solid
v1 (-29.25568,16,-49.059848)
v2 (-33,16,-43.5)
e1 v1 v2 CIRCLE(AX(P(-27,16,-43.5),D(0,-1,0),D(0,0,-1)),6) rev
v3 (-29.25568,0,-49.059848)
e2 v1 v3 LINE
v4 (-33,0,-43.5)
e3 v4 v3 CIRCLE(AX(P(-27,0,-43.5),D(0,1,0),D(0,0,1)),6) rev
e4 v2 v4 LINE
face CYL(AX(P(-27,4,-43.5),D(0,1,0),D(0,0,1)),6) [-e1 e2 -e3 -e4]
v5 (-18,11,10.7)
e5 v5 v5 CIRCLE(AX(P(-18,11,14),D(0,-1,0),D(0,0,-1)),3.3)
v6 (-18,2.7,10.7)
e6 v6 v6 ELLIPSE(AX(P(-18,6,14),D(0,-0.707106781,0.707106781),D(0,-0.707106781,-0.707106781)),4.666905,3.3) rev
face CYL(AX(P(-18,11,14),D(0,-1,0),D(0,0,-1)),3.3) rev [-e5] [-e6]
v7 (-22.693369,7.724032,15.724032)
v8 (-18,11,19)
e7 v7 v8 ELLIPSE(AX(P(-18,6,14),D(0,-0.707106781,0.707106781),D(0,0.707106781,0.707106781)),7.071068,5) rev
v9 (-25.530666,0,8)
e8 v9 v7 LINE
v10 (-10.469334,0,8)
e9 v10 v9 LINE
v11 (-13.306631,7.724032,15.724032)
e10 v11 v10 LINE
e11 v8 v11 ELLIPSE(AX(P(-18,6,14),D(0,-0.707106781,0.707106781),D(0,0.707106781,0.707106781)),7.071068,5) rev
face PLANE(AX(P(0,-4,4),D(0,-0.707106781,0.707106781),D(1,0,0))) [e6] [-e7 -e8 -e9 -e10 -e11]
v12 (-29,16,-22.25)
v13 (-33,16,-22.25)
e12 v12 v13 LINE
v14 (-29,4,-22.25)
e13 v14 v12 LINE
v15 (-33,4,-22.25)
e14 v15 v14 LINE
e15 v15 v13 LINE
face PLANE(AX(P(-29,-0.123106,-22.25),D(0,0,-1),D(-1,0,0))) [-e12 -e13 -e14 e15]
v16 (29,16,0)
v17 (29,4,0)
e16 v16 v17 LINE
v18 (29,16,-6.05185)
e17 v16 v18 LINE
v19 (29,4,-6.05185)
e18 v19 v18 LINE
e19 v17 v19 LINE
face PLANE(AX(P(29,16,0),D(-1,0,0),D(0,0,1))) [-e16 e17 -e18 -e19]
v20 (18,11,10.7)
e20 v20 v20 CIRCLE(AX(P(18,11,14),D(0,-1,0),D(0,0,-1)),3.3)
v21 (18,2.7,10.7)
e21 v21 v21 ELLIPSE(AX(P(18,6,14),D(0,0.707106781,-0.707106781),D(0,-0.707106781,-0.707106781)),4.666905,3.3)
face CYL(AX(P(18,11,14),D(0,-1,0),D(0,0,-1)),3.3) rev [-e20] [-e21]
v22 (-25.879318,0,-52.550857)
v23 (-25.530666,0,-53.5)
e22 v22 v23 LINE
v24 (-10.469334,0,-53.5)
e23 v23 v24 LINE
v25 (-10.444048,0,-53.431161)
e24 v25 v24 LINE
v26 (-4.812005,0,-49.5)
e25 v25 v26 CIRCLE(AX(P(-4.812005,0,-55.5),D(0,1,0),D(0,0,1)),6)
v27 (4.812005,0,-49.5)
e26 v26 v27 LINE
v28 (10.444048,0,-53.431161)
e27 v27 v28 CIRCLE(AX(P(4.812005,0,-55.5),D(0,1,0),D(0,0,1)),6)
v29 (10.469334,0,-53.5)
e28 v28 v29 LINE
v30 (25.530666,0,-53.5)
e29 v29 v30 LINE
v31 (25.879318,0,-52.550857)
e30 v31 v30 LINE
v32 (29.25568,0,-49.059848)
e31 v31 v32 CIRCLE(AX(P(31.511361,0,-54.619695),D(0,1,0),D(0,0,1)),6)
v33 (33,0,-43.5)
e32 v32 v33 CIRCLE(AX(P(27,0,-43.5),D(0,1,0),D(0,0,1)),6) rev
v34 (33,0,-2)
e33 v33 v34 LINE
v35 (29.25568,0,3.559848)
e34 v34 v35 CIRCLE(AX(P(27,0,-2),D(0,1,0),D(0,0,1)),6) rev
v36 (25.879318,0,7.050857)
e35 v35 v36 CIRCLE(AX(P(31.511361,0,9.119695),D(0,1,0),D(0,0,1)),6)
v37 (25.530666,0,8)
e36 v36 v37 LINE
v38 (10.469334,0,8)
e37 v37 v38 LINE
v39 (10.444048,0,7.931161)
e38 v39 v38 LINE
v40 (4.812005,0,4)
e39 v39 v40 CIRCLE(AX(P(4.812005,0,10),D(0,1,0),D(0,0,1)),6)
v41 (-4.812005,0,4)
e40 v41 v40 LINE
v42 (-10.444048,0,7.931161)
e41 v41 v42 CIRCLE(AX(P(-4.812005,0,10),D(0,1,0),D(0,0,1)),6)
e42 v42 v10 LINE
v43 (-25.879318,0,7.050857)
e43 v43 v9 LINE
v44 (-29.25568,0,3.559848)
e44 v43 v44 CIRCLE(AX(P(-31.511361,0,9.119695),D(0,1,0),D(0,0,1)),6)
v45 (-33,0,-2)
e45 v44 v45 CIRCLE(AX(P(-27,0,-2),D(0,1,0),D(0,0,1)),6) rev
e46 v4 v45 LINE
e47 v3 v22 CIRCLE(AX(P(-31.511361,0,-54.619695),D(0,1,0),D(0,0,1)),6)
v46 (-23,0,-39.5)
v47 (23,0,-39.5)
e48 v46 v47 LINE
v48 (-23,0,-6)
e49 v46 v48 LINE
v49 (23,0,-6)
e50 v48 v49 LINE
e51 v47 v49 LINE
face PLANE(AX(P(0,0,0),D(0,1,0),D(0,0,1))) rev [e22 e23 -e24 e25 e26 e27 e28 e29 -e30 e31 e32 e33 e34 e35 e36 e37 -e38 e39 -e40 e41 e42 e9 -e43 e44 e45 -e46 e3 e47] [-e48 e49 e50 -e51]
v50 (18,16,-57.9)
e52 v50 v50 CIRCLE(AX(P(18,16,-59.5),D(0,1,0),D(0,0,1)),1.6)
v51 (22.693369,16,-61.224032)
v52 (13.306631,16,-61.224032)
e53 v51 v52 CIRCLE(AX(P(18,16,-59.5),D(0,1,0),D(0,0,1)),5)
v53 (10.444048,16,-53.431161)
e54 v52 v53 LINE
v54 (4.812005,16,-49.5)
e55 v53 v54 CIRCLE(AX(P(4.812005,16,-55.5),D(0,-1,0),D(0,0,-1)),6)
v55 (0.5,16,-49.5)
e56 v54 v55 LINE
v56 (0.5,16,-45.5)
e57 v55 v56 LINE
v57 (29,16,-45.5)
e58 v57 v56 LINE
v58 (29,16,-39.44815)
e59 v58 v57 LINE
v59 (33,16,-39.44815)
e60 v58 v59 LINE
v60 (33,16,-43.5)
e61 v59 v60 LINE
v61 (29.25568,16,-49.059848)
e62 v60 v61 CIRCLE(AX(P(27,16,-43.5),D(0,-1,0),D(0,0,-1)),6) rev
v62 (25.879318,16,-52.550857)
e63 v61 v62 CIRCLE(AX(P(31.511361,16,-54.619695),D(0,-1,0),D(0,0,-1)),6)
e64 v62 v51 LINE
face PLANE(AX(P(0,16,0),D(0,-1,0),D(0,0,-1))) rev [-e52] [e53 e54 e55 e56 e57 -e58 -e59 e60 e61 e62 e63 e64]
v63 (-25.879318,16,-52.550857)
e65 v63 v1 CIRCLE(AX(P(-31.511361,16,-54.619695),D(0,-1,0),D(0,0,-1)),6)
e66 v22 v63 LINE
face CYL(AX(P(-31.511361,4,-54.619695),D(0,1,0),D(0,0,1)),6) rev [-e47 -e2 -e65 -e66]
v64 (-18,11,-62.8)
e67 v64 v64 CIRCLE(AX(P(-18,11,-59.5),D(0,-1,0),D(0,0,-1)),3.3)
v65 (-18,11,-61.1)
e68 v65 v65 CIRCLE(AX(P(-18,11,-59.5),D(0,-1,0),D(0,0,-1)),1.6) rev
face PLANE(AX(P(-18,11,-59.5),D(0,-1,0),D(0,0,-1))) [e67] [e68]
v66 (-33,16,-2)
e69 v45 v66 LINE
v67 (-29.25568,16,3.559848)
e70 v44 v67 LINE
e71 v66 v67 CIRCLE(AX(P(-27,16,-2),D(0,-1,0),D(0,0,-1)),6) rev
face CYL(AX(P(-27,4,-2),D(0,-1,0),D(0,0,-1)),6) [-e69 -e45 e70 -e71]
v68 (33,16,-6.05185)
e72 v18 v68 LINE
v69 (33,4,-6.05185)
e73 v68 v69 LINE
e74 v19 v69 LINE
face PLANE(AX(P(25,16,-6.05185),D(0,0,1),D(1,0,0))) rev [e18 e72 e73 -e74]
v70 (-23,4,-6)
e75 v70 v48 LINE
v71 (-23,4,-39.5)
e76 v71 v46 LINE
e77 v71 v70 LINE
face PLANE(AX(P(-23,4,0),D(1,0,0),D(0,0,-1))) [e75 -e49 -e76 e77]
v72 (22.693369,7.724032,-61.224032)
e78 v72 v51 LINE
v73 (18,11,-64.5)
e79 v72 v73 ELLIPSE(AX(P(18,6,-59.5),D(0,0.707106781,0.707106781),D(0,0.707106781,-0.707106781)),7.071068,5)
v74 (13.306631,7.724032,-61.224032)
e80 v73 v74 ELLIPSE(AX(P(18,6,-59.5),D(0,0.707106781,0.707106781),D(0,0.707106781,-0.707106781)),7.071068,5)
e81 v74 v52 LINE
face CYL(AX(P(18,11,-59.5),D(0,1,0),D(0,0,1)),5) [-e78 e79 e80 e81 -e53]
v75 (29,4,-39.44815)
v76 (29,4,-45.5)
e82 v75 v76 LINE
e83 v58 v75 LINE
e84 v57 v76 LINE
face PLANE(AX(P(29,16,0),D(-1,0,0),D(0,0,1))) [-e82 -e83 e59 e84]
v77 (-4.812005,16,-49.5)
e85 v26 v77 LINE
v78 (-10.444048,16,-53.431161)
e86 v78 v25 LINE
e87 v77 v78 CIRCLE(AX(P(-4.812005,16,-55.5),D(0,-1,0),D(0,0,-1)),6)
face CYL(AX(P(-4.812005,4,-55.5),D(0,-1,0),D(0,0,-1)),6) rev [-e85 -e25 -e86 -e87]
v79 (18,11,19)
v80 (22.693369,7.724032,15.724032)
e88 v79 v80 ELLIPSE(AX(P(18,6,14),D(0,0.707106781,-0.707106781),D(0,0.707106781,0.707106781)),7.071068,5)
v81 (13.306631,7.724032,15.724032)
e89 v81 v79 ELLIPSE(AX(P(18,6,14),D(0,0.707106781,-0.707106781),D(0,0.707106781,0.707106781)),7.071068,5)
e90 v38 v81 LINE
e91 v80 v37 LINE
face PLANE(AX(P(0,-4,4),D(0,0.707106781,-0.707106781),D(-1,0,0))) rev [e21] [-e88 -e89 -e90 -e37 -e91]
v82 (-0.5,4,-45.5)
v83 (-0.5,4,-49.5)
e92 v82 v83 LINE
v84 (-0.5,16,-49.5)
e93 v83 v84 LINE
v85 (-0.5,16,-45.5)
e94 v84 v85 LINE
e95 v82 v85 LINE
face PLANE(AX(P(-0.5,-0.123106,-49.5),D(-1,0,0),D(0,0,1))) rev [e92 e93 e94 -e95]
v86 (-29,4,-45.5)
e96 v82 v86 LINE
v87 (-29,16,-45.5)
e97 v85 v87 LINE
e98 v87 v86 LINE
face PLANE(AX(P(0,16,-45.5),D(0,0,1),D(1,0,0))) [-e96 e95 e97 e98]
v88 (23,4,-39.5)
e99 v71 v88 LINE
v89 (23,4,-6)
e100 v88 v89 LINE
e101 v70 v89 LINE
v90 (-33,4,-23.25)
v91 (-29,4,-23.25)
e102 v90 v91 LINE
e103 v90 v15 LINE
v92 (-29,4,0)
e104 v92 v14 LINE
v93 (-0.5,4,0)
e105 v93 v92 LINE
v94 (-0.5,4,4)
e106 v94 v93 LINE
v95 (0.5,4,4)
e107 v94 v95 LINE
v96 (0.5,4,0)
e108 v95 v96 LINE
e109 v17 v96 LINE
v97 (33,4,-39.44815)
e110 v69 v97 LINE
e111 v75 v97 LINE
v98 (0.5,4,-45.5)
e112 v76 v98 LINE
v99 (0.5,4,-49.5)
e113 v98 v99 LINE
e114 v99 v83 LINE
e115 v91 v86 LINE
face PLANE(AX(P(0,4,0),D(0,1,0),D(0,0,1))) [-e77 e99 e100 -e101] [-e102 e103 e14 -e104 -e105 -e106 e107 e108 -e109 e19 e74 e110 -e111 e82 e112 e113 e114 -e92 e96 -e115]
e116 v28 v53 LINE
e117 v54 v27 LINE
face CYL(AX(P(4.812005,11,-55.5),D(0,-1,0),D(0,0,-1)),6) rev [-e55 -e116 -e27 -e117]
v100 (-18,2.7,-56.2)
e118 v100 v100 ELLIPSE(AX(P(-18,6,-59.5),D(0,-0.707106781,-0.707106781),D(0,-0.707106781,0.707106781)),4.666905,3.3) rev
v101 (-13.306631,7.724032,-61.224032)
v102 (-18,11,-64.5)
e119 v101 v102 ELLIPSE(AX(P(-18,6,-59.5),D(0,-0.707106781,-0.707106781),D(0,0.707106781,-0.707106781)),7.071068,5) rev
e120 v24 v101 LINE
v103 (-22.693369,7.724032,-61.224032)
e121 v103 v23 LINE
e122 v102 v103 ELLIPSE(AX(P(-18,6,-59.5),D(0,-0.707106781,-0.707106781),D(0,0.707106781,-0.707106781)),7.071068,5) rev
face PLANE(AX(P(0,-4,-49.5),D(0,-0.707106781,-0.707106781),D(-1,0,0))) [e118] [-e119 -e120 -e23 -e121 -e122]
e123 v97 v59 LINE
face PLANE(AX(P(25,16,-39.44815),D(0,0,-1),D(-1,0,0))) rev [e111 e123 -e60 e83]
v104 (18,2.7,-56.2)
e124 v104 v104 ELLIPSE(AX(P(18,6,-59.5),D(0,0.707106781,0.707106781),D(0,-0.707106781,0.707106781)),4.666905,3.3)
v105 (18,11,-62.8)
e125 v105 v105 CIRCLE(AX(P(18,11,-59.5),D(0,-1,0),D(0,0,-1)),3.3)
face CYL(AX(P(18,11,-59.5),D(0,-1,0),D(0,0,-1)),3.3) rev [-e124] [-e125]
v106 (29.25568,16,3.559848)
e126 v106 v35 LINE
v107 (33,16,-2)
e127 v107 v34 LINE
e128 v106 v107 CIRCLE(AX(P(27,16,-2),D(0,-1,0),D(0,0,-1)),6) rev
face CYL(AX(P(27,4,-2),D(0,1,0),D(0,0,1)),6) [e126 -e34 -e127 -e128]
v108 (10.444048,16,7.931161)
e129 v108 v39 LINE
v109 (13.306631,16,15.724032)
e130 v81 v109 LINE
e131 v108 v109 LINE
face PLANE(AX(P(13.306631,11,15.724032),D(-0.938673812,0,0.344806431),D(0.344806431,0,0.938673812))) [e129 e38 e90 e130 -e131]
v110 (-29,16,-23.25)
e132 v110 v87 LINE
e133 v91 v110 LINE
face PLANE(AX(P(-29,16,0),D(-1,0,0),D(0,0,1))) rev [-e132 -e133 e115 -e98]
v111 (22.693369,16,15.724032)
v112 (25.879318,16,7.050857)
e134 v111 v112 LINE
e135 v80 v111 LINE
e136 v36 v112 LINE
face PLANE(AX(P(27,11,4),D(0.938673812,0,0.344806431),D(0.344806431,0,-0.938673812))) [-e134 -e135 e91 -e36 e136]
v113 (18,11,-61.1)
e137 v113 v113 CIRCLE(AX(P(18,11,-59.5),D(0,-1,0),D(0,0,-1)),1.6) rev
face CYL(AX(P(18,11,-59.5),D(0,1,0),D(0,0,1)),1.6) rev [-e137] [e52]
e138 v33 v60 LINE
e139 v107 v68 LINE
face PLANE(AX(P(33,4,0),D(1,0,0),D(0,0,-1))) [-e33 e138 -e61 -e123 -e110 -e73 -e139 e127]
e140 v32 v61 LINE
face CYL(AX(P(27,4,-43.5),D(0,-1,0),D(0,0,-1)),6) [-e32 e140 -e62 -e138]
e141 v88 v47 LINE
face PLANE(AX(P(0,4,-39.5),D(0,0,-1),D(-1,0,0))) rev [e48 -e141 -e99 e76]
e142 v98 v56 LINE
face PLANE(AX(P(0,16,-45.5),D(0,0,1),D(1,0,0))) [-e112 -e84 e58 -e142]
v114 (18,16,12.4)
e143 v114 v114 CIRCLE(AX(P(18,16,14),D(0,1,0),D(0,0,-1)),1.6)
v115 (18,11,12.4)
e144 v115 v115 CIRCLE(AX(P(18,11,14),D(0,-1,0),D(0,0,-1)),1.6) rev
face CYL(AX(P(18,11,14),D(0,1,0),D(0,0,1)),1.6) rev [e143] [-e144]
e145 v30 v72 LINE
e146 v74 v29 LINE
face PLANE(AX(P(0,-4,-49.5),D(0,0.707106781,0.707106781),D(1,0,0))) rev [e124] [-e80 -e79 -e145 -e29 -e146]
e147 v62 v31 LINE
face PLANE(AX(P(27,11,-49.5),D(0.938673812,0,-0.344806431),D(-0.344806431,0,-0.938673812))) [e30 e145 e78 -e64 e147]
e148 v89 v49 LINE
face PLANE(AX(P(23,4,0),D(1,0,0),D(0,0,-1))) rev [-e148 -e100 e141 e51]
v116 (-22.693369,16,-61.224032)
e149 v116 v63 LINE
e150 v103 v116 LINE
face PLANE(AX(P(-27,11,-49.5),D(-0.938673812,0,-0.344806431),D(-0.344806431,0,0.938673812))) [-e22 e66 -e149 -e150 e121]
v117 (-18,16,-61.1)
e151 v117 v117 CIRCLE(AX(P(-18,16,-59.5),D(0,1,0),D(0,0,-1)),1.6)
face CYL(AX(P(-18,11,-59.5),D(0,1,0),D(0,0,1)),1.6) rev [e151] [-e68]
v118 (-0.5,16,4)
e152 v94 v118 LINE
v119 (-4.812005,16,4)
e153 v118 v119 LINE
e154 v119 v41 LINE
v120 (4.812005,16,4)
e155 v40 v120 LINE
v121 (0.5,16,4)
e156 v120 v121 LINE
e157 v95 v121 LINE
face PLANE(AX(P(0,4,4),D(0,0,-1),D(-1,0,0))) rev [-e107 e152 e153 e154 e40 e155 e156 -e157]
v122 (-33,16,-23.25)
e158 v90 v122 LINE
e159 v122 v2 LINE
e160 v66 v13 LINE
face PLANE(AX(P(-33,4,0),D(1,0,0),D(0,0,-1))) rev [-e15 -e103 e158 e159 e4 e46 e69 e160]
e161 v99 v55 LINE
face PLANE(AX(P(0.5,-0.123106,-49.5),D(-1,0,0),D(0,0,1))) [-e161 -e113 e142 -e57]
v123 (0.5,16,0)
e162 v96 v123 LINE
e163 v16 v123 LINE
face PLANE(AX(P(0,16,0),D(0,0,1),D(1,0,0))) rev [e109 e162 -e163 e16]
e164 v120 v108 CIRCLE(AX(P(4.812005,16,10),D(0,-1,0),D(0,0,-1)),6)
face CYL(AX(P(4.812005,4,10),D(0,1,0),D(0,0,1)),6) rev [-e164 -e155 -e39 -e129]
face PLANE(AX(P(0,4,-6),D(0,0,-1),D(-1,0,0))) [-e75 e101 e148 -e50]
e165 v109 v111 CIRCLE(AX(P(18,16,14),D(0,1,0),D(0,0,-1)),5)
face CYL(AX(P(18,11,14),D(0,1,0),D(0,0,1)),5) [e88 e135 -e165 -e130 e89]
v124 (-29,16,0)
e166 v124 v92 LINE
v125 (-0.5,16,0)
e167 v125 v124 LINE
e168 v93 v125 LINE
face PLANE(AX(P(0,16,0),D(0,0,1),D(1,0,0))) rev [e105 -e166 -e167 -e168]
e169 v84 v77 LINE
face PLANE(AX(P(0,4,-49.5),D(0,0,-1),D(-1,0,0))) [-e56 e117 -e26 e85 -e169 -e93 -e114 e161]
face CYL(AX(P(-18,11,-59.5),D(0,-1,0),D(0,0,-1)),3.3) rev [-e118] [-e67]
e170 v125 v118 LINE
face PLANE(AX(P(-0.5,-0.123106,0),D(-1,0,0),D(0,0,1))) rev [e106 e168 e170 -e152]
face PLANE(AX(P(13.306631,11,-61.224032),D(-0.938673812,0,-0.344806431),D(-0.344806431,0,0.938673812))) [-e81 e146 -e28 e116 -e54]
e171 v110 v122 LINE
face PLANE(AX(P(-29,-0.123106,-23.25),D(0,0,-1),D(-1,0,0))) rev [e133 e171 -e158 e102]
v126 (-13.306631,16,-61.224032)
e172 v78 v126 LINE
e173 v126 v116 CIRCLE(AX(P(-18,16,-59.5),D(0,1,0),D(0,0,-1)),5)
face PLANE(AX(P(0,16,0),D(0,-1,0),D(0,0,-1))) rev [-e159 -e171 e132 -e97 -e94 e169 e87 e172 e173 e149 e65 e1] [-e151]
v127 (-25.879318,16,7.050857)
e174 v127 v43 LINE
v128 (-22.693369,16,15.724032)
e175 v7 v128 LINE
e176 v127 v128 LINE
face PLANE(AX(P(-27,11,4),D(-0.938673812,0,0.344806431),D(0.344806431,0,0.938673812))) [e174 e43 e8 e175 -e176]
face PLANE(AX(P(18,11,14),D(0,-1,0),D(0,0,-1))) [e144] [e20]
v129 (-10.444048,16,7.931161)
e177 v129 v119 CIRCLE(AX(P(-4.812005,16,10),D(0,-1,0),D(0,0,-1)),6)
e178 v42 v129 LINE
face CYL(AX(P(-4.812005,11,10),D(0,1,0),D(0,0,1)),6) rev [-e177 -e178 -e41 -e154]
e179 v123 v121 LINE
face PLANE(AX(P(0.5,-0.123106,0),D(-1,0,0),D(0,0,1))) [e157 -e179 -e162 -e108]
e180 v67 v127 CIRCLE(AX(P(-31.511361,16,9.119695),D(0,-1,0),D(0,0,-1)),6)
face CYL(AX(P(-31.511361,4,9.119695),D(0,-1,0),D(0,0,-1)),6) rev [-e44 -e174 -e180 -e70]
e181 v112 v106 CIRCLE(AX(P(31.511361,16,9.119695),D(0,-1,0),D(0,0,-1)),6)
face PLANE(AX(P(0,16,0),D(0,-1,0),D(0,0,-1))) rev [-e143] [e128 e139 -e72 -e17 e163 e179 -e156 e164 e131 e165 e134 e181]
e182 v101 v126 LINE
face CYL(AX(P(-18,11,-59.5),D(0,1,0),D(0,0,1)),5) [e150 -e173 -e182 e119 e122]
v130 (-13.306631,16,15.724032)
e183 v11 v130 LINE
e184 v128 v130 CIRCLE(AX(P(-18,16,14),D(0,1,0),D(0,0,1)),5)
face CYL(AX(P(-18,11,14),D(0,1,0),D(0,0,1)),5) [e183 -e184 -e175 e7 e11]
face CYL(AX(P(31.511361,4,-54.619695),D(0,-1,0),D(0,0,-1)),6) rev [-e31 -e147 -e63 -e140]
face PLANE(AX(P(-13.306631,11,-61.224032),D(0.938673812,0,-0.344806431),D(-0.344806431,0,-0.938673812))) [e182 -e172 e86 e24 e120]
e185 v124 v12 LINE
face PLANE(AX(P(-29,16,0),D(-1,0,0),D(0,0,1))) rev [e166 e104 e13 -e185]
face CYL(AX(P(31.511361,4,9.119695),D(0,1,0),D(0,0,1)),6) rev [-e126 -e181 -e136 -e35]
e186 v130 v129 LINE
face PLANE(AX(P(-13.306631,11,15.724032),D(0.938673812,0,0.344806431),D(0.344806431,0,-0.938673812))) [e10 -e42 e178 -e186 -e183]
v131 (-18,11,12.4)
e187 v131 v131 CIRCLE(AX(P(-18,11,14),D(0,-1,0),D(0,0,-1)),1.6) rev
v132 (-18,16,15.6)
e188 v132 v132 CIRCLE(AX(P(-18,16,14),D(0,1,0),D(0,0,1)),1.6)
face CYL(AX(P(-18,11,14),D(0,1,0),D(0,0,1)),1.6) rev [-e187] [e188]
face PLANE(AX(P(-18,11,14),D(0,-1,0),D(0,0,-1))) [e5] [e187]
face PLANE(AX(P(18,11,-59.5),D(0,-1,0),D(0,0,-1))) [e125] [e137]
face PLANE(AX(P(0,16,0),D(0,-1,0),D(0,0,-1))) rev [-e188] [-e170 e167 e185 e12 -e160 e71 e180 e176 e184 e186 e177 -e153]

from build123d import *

# Parameters (mm, degrees)
SKETCH_1_W            = 66
SKETCH_1_H            = 53.5
SKETCH_1_W_2          = 58
SKETCH_1_H_2          = 45.5
SKETCH_1_W_3          = 46
SKETCH_1_H_3          = 33.5
EXTRUDE_1_DEPTH       = 4
EXTRUDE_START         = 4
SKETCH_1_4_W          = 66
SKETCH_1_4_H          = 53.5
SKETCH_1_4_W_2        = 58
SKETCH_1_4_H_2        = 45.5
EXTRUDE_2_DEPTH       = 12
SKETCH_2_R            = 1.6
EXTRUDE_3_DEPTH       = 5
CHAMFER_1_OUTLINE_R   = 1.6
CHAMFER_1_DEPTH       = 11
CHAMFER_START         = -14
CHAMFER_1_2_OUTLINE_W = 54
CHAMFER_1_2_OUTLINE_H = 60.830212793
CHAMFER_1_2_DEPTH     = 8.343145751
CHAMFER_START_2       = 35.001785669
CHAMFER_1_3_OUTLINE_W = 54
CHAMFER_1_3_OUTLINE_H = 8.169787207
CHAMFER_1_3_DEPTH     = 18.384776311
SKETCH_4_R            = 3.3
CUT_EXTRUDE_1_DEPTH   = 11
SKETCH_5_W            = 1
SKETCH_5_H            = 4
SKETCH_5_W_2          = 4
SKETCH_5_H_2          = 1
CUT_EXTRUDE_1_2_DEPTH = 12
FILLET_1_R            = 6
FILLET_2_R            = 6
SKETCH_6_W            = 33.396299262
SKETCH_6_H            = 12
CUT_EXTRUDE_2_DEPTH   = 8


with BuildPart() as part:
    # 草图1 → 凸台-拉伸1 (new body)
    # profile 1 of 2: a face of its own
    with BuildSketch(Plane(origin=(0, 0, 0), x_dir=(1, 0, 0), z_dir=(0, 1, 0))):
        with Locations((0, 22.75)):
            Rectangle(SKETCH_1_W, SKETCH_1_H)
        with Locations((0, 22.75)):
            Rectangle(SKETCH_1_W_2, SKETCH_1_H_2, mode=Mode.SUBTRACT)
    # profile 2 of 2: a face of its own
    with BuildSketch(Plane(origin=(0, 0, 0), x_dir=(1, 0, 0), z_dir=(0, 1, 0))):
        with Locations((0, 22.75)):
            Rectangle(SKETCH_1_W_2, SKETCH_1_H_2)
        with Locations((0, 22.75)):
            Rectangle(SKETCH_1_W_3, SKETCH_1_H_3, mode=Mode.SUBTRACT)
    extrude(amount=EXTRUDE_1_DEPTH)

    # 草图1<4> → 凸台-拉伸2 (add)
    with BuildSketch(Plane(origin=(0, 0, 0), x_dir=(1, 0, 0), z_dir=(0, 1, 0)).offset(EXTRUDE_START)):
        with Locations((0, 22.75)):
            Rectangle(SKETCH_1_4_W, SKETCH_1_4_H)
        with Locations((0, 22.75)):
            Rectangle(SKETCH_1_4_W_2, SKETCH_1_4_H_2, mode=Mode.SUBTRACT)
    extrude(amount=EXTRUDE_2_DEPTH)

    # 草图2 → 凸台-拉伸3 (add)
    # profile 1 of 4: a face of its own
    with BuildSketch(Plane(origin=(0, 16, 0), x_dir=(1, 0, 0), z_dir=(0, 1, 0))):
        with BuildLine():
            Line((13.30663094, 61.224032154), (9, 49.5))
            Line((9, 49.5), (27, 49.5))
            Line((27, 49.5), (22.69336906, 61.224032154))
            ThreePointArc((22.69336906, 61.224032154), (18, 64.5), (13.30663094, 61.224032154))
        make_face()
        with Locations(Location((18, 59.5, 0), (0, 0, 270))):
            Circle(SKETCH_2_R, mode=Mode.SUBTRACT)
    # profile 2 of 4: a face of its own
    with BuildSketch(Plane(origin=(0, 16, 0), x_dir=(1, 0, 0), z_dir=(0, 1, 0))):
        with BuildLine():
            Line((-27, 49.5), (-22.69336906, 61.224032154))
            ThreePointArc((-22.69336906, 61.224032154), (-18, 64.5), (-13.30663094, 61.224032154))
            Line((-13.30663094, 61.224032154), (-9, 49.5))
            Line((-9, 49.5), (-27, 49.5))
        make_face()
        with Locations(Location((-18, 59.5, 0), (0, 0, 90))):
            Circle(SKETCH_2_R, mode=Mode.SUBTRACT)
    # profile 3 of 4: a face of its own
    with BuildSketch(Plane(origin=(0, 16, 0), x_dir=(1, 0, 0), z_dir=(0, 1, 0))):
        with BuildLine():
            Line((-13.30663094, -15.724032154), (-9, -4))
            Line((-9, -4), (-27, -4))
            Line((-27, -4), (-22.69336906, -15.724032154))
            ThreePointArc((-22.69336906, -15.724032154), (-18, -19), (-13.30663094, -15.724032154))
        make_face()
        with Locations(Location((-18, -14, 0), (0, 0, 270))):
            Circle(SKETCH_2_R, mode=Mode.SUBTRACT)
    # profile 4 of 4: a face of its own
    with BuildSketch(Plane(origin=(0, 16, 0), x_dir=(1, 0, 0), z_dir=(0, 1, 0))):
        with BuildLine():
            Line((27, -4), (22.69336906, -15.724032154))
            ThreePointArc((22.69336906, -15.724032154), (18, -19), (13.30663094, -15.724032154))
            Line((13.30663094, -15.724032154), (9, -4))
            Line((9, -4), (27, -4))
        make_face()
        with Locations(Location((18, -14, 0), (0, 0, 90))):
            Circle(SKETCH_2_R, mode=Mode.SUBTRACT)
    extrude(amount=-EXTRUDE_3_DEPTH)

    # 倒角1: read off the stored shape, not the designer's step
    # 倒角1 outline → 倒角1 (add)
    # profile 1 of 4: a face of its own
    with BuildSketch(Plane(origin=(0, 0, 0), x_dir=(1, 0, 0), z_dir=(0, 1, 0))):
        with BuildLine():
            Line((9, 49.5), (27, 49.5))
            Line((27, 49.5), (22.69336906, 61.224032154))
            ThreePointArc((22.69336906, 61.224032154), (18, 64.5), (13.30663094, 61.224032154))
            Line((13.30663094, 61.224032154), (9, 49.5))
        make_face()
        with Locations((18, 59.5)):
            Circle(CHAMFER_1_OUTLINE_R, mode=Mode.SUBTRACT)
    # profile 2 of 4: a face of its own
    with BuildSketch(Plane(origin=(0, 0, 0), x_dir=(1, 0, 0), z_dir=(0, 1, 0))):
        with BuildLine():
            Line((-27, 49.5), (-9, 49.5))
            Line((-9, 49.5), (-13.30663094, 61.224032154))
            ThreePointArc((-13.30663094, 61.224032154), (-18, 64.5), (-22.69336906, 61.224032154))
            Line((-22.69336906, 61.224032154), (-27, 49.5))
        make_face()
        with Locations((-18, 59.5)):
            Circle(CHAMFER_1_OUTLINE_R, mode=Mode.SUBTRACT)
    # profile 3 of 4: a face of its own
    with BuildSketch(Plane(origin=(0, 0, 0), x_dir=(1, 0, 0), z_dir=(0, 1, 0))):
        with BuildLine():
            Line((-27, -4), (-22.69336906, -15.724032154))
            ThreePointArc((-22.69336906, -15.724032154), (-18, -19), (-13.30663094, -15.724032154))
            Line((-13.30663094, -15.724032154), (-9, -4))
            Line((-9, -4), (-27, -4))
        make_face()
        with Locations((-18, -14)):
            Circle(CHAMFER_1_OUTLINE_R, mode=Mode.SUBTRACT)
    # profile 4 of 4: a face of its own
    with BuildSketch(Plane(origin=(0, 0, 0), x_dir=(1, 0, 0), z_dir=(0, 1, 0))):
        with BuildLine():
            Line((27, -4), (9, -4))
            Line((9, -4), (13.30663094, -15.724032154))
            ThreePointArc((13.30663094, -15.724032154), (18, -19), (22.69336906, -15.724032154))
            Line((22.69336906, -15.724032154), (27, -4))
        make_face()
        with Locations((18, -14)):
            Circle(CHAMFER_1_OUTLINE_R, mode=Mode.SUBTRACT)
    extrude(amount=CHAMFER_1_DEPTH)

    # Chamfer 1 2 outline → Chamfer 1 2 (cut)
    with BuildSketch(Plane(origin=(0, 0, 0), x_dir=(1, 0, 0), z_dir=(0, 0.707106781186544, -0.707106781186551)).offset(CHAMFER_START)):
        with Locations((0, 7.415106397)):
            Rectangle(CHAMFER_1_2_OUTLINE_W, CHAMFER_1_2_OUTLINE_H)
    extrude(amount=CHAMFER_1_2_DEPTH, mode=Mode.SUBTRACT)

    # Chamfer 1 3 outline → Chamfer 1 3 (cut)
    with BuildSketch(Plane(origin=(0, 0, 0), x_dir=(1, 0, 0), z_dir=(0, 0.707106781186544, -0.707106781186551)).offset(CHAMFER_START_2)):
        with Locations((0, 41.915106397)):
            Rectangle(CHAMFER_1_3_OUTLINE_W, CHAMFER_1_3_OUTLINE_H)
    extrude(amount=CHAMFER_1_3_DEPTH, mode=Mode.SUBTRACT)

    # 草图4 → Cut-Extrude 1 (cut)
    with BuildSketch(Plane.XZ):
        with Locations(Location((-18, 14, 0), (0, 0, 270))):
            Circle(SKETCH_4_R)
        with Locations(Location((18, 14, 0), (0, 0, 270))):
            Circle(SKETCH_4_R)
        with Locations(Location((18, -59.5, 0), (0, 0, 270))):
            Circle(SKETCH_4_R)
        with Locations(Location((-18, -59.5, 0), (0, 0, 270))):
            Circle(SKETCH_4_R)
    extrude(amount=-CUT_EXTRUDE_1_DEPTH, mode=Mode.SUBTRACT)

    # 草图5 → Cut-Extrude 1 2 (cut)
    with BuildSketch(Plane(origin=(0, 16, 0), x_dir=(1, 0, 0), z_dir=(0, 1, 0))):
        with Locations((0, 47.5)):
            Rectangle(SKETCH_5_W, SKETCH_5_H)
        with Locations((31, 22.75)):
            Rectangle(SKETCH_5_W_2, SKETCH_5_H_2)
        with Locations((0, -2)):
            Rectangle(SKETCH_5_W, SKETCH_5_H)
        with Locations((-31, 22.75)):
            Rectangle(SKETCH_5_W_2, SKETCH_5_H_2)
    extrude(amount=-CUT_EXTRUDE_1_2_DEPTH, mode=Mode.SUBTRACT)

    # 圆角1
    fillet_1_edges = [part.edges().sort_by_distance(p)[0] for p in [
        (-33, 8, -49.5),
        (-33, 8, 4),
        (33, 8, -49.5),
        (33, 8, 4),
    ]]
    fillet(fillet_1_edges, radius=FILLET_1_R - 0.0001)  # a hair under: the kernel refuses the full size

    # 圆角2
    fillet_2_edges = [part.edges().sort_by_distance(p)[0] for p in [
        (27, 5.5, -49.5),
        (9, 5.5, -49.5),
        (-9, 5.5, -49.5),
        (-27, 5.5, -49.5),
        (-27, 5.5, 4),
        (-9, 5.5, 4),
        (9, 5.5, 4),
        (27, 5.5, 4),
    ]]
    fillet(fillet_2_edges, radius=FILLET_2_R)

    # 草图6 → 切除-拉伸2 (cut)
    with BuildSketch(Plane(origin=(33, 0, 0), x_dir=(0, 0, -1), z_dir=(1, 0, 0))):
        with Locations((22.75, 10)):
            Rectangle(SKETCH_6_W, SKETCH_6_H)
    extrude(amount=-CUT_EXTRUDE_2_DEPTH, mode=Mode.SUBTRACT)


solid = part.part
